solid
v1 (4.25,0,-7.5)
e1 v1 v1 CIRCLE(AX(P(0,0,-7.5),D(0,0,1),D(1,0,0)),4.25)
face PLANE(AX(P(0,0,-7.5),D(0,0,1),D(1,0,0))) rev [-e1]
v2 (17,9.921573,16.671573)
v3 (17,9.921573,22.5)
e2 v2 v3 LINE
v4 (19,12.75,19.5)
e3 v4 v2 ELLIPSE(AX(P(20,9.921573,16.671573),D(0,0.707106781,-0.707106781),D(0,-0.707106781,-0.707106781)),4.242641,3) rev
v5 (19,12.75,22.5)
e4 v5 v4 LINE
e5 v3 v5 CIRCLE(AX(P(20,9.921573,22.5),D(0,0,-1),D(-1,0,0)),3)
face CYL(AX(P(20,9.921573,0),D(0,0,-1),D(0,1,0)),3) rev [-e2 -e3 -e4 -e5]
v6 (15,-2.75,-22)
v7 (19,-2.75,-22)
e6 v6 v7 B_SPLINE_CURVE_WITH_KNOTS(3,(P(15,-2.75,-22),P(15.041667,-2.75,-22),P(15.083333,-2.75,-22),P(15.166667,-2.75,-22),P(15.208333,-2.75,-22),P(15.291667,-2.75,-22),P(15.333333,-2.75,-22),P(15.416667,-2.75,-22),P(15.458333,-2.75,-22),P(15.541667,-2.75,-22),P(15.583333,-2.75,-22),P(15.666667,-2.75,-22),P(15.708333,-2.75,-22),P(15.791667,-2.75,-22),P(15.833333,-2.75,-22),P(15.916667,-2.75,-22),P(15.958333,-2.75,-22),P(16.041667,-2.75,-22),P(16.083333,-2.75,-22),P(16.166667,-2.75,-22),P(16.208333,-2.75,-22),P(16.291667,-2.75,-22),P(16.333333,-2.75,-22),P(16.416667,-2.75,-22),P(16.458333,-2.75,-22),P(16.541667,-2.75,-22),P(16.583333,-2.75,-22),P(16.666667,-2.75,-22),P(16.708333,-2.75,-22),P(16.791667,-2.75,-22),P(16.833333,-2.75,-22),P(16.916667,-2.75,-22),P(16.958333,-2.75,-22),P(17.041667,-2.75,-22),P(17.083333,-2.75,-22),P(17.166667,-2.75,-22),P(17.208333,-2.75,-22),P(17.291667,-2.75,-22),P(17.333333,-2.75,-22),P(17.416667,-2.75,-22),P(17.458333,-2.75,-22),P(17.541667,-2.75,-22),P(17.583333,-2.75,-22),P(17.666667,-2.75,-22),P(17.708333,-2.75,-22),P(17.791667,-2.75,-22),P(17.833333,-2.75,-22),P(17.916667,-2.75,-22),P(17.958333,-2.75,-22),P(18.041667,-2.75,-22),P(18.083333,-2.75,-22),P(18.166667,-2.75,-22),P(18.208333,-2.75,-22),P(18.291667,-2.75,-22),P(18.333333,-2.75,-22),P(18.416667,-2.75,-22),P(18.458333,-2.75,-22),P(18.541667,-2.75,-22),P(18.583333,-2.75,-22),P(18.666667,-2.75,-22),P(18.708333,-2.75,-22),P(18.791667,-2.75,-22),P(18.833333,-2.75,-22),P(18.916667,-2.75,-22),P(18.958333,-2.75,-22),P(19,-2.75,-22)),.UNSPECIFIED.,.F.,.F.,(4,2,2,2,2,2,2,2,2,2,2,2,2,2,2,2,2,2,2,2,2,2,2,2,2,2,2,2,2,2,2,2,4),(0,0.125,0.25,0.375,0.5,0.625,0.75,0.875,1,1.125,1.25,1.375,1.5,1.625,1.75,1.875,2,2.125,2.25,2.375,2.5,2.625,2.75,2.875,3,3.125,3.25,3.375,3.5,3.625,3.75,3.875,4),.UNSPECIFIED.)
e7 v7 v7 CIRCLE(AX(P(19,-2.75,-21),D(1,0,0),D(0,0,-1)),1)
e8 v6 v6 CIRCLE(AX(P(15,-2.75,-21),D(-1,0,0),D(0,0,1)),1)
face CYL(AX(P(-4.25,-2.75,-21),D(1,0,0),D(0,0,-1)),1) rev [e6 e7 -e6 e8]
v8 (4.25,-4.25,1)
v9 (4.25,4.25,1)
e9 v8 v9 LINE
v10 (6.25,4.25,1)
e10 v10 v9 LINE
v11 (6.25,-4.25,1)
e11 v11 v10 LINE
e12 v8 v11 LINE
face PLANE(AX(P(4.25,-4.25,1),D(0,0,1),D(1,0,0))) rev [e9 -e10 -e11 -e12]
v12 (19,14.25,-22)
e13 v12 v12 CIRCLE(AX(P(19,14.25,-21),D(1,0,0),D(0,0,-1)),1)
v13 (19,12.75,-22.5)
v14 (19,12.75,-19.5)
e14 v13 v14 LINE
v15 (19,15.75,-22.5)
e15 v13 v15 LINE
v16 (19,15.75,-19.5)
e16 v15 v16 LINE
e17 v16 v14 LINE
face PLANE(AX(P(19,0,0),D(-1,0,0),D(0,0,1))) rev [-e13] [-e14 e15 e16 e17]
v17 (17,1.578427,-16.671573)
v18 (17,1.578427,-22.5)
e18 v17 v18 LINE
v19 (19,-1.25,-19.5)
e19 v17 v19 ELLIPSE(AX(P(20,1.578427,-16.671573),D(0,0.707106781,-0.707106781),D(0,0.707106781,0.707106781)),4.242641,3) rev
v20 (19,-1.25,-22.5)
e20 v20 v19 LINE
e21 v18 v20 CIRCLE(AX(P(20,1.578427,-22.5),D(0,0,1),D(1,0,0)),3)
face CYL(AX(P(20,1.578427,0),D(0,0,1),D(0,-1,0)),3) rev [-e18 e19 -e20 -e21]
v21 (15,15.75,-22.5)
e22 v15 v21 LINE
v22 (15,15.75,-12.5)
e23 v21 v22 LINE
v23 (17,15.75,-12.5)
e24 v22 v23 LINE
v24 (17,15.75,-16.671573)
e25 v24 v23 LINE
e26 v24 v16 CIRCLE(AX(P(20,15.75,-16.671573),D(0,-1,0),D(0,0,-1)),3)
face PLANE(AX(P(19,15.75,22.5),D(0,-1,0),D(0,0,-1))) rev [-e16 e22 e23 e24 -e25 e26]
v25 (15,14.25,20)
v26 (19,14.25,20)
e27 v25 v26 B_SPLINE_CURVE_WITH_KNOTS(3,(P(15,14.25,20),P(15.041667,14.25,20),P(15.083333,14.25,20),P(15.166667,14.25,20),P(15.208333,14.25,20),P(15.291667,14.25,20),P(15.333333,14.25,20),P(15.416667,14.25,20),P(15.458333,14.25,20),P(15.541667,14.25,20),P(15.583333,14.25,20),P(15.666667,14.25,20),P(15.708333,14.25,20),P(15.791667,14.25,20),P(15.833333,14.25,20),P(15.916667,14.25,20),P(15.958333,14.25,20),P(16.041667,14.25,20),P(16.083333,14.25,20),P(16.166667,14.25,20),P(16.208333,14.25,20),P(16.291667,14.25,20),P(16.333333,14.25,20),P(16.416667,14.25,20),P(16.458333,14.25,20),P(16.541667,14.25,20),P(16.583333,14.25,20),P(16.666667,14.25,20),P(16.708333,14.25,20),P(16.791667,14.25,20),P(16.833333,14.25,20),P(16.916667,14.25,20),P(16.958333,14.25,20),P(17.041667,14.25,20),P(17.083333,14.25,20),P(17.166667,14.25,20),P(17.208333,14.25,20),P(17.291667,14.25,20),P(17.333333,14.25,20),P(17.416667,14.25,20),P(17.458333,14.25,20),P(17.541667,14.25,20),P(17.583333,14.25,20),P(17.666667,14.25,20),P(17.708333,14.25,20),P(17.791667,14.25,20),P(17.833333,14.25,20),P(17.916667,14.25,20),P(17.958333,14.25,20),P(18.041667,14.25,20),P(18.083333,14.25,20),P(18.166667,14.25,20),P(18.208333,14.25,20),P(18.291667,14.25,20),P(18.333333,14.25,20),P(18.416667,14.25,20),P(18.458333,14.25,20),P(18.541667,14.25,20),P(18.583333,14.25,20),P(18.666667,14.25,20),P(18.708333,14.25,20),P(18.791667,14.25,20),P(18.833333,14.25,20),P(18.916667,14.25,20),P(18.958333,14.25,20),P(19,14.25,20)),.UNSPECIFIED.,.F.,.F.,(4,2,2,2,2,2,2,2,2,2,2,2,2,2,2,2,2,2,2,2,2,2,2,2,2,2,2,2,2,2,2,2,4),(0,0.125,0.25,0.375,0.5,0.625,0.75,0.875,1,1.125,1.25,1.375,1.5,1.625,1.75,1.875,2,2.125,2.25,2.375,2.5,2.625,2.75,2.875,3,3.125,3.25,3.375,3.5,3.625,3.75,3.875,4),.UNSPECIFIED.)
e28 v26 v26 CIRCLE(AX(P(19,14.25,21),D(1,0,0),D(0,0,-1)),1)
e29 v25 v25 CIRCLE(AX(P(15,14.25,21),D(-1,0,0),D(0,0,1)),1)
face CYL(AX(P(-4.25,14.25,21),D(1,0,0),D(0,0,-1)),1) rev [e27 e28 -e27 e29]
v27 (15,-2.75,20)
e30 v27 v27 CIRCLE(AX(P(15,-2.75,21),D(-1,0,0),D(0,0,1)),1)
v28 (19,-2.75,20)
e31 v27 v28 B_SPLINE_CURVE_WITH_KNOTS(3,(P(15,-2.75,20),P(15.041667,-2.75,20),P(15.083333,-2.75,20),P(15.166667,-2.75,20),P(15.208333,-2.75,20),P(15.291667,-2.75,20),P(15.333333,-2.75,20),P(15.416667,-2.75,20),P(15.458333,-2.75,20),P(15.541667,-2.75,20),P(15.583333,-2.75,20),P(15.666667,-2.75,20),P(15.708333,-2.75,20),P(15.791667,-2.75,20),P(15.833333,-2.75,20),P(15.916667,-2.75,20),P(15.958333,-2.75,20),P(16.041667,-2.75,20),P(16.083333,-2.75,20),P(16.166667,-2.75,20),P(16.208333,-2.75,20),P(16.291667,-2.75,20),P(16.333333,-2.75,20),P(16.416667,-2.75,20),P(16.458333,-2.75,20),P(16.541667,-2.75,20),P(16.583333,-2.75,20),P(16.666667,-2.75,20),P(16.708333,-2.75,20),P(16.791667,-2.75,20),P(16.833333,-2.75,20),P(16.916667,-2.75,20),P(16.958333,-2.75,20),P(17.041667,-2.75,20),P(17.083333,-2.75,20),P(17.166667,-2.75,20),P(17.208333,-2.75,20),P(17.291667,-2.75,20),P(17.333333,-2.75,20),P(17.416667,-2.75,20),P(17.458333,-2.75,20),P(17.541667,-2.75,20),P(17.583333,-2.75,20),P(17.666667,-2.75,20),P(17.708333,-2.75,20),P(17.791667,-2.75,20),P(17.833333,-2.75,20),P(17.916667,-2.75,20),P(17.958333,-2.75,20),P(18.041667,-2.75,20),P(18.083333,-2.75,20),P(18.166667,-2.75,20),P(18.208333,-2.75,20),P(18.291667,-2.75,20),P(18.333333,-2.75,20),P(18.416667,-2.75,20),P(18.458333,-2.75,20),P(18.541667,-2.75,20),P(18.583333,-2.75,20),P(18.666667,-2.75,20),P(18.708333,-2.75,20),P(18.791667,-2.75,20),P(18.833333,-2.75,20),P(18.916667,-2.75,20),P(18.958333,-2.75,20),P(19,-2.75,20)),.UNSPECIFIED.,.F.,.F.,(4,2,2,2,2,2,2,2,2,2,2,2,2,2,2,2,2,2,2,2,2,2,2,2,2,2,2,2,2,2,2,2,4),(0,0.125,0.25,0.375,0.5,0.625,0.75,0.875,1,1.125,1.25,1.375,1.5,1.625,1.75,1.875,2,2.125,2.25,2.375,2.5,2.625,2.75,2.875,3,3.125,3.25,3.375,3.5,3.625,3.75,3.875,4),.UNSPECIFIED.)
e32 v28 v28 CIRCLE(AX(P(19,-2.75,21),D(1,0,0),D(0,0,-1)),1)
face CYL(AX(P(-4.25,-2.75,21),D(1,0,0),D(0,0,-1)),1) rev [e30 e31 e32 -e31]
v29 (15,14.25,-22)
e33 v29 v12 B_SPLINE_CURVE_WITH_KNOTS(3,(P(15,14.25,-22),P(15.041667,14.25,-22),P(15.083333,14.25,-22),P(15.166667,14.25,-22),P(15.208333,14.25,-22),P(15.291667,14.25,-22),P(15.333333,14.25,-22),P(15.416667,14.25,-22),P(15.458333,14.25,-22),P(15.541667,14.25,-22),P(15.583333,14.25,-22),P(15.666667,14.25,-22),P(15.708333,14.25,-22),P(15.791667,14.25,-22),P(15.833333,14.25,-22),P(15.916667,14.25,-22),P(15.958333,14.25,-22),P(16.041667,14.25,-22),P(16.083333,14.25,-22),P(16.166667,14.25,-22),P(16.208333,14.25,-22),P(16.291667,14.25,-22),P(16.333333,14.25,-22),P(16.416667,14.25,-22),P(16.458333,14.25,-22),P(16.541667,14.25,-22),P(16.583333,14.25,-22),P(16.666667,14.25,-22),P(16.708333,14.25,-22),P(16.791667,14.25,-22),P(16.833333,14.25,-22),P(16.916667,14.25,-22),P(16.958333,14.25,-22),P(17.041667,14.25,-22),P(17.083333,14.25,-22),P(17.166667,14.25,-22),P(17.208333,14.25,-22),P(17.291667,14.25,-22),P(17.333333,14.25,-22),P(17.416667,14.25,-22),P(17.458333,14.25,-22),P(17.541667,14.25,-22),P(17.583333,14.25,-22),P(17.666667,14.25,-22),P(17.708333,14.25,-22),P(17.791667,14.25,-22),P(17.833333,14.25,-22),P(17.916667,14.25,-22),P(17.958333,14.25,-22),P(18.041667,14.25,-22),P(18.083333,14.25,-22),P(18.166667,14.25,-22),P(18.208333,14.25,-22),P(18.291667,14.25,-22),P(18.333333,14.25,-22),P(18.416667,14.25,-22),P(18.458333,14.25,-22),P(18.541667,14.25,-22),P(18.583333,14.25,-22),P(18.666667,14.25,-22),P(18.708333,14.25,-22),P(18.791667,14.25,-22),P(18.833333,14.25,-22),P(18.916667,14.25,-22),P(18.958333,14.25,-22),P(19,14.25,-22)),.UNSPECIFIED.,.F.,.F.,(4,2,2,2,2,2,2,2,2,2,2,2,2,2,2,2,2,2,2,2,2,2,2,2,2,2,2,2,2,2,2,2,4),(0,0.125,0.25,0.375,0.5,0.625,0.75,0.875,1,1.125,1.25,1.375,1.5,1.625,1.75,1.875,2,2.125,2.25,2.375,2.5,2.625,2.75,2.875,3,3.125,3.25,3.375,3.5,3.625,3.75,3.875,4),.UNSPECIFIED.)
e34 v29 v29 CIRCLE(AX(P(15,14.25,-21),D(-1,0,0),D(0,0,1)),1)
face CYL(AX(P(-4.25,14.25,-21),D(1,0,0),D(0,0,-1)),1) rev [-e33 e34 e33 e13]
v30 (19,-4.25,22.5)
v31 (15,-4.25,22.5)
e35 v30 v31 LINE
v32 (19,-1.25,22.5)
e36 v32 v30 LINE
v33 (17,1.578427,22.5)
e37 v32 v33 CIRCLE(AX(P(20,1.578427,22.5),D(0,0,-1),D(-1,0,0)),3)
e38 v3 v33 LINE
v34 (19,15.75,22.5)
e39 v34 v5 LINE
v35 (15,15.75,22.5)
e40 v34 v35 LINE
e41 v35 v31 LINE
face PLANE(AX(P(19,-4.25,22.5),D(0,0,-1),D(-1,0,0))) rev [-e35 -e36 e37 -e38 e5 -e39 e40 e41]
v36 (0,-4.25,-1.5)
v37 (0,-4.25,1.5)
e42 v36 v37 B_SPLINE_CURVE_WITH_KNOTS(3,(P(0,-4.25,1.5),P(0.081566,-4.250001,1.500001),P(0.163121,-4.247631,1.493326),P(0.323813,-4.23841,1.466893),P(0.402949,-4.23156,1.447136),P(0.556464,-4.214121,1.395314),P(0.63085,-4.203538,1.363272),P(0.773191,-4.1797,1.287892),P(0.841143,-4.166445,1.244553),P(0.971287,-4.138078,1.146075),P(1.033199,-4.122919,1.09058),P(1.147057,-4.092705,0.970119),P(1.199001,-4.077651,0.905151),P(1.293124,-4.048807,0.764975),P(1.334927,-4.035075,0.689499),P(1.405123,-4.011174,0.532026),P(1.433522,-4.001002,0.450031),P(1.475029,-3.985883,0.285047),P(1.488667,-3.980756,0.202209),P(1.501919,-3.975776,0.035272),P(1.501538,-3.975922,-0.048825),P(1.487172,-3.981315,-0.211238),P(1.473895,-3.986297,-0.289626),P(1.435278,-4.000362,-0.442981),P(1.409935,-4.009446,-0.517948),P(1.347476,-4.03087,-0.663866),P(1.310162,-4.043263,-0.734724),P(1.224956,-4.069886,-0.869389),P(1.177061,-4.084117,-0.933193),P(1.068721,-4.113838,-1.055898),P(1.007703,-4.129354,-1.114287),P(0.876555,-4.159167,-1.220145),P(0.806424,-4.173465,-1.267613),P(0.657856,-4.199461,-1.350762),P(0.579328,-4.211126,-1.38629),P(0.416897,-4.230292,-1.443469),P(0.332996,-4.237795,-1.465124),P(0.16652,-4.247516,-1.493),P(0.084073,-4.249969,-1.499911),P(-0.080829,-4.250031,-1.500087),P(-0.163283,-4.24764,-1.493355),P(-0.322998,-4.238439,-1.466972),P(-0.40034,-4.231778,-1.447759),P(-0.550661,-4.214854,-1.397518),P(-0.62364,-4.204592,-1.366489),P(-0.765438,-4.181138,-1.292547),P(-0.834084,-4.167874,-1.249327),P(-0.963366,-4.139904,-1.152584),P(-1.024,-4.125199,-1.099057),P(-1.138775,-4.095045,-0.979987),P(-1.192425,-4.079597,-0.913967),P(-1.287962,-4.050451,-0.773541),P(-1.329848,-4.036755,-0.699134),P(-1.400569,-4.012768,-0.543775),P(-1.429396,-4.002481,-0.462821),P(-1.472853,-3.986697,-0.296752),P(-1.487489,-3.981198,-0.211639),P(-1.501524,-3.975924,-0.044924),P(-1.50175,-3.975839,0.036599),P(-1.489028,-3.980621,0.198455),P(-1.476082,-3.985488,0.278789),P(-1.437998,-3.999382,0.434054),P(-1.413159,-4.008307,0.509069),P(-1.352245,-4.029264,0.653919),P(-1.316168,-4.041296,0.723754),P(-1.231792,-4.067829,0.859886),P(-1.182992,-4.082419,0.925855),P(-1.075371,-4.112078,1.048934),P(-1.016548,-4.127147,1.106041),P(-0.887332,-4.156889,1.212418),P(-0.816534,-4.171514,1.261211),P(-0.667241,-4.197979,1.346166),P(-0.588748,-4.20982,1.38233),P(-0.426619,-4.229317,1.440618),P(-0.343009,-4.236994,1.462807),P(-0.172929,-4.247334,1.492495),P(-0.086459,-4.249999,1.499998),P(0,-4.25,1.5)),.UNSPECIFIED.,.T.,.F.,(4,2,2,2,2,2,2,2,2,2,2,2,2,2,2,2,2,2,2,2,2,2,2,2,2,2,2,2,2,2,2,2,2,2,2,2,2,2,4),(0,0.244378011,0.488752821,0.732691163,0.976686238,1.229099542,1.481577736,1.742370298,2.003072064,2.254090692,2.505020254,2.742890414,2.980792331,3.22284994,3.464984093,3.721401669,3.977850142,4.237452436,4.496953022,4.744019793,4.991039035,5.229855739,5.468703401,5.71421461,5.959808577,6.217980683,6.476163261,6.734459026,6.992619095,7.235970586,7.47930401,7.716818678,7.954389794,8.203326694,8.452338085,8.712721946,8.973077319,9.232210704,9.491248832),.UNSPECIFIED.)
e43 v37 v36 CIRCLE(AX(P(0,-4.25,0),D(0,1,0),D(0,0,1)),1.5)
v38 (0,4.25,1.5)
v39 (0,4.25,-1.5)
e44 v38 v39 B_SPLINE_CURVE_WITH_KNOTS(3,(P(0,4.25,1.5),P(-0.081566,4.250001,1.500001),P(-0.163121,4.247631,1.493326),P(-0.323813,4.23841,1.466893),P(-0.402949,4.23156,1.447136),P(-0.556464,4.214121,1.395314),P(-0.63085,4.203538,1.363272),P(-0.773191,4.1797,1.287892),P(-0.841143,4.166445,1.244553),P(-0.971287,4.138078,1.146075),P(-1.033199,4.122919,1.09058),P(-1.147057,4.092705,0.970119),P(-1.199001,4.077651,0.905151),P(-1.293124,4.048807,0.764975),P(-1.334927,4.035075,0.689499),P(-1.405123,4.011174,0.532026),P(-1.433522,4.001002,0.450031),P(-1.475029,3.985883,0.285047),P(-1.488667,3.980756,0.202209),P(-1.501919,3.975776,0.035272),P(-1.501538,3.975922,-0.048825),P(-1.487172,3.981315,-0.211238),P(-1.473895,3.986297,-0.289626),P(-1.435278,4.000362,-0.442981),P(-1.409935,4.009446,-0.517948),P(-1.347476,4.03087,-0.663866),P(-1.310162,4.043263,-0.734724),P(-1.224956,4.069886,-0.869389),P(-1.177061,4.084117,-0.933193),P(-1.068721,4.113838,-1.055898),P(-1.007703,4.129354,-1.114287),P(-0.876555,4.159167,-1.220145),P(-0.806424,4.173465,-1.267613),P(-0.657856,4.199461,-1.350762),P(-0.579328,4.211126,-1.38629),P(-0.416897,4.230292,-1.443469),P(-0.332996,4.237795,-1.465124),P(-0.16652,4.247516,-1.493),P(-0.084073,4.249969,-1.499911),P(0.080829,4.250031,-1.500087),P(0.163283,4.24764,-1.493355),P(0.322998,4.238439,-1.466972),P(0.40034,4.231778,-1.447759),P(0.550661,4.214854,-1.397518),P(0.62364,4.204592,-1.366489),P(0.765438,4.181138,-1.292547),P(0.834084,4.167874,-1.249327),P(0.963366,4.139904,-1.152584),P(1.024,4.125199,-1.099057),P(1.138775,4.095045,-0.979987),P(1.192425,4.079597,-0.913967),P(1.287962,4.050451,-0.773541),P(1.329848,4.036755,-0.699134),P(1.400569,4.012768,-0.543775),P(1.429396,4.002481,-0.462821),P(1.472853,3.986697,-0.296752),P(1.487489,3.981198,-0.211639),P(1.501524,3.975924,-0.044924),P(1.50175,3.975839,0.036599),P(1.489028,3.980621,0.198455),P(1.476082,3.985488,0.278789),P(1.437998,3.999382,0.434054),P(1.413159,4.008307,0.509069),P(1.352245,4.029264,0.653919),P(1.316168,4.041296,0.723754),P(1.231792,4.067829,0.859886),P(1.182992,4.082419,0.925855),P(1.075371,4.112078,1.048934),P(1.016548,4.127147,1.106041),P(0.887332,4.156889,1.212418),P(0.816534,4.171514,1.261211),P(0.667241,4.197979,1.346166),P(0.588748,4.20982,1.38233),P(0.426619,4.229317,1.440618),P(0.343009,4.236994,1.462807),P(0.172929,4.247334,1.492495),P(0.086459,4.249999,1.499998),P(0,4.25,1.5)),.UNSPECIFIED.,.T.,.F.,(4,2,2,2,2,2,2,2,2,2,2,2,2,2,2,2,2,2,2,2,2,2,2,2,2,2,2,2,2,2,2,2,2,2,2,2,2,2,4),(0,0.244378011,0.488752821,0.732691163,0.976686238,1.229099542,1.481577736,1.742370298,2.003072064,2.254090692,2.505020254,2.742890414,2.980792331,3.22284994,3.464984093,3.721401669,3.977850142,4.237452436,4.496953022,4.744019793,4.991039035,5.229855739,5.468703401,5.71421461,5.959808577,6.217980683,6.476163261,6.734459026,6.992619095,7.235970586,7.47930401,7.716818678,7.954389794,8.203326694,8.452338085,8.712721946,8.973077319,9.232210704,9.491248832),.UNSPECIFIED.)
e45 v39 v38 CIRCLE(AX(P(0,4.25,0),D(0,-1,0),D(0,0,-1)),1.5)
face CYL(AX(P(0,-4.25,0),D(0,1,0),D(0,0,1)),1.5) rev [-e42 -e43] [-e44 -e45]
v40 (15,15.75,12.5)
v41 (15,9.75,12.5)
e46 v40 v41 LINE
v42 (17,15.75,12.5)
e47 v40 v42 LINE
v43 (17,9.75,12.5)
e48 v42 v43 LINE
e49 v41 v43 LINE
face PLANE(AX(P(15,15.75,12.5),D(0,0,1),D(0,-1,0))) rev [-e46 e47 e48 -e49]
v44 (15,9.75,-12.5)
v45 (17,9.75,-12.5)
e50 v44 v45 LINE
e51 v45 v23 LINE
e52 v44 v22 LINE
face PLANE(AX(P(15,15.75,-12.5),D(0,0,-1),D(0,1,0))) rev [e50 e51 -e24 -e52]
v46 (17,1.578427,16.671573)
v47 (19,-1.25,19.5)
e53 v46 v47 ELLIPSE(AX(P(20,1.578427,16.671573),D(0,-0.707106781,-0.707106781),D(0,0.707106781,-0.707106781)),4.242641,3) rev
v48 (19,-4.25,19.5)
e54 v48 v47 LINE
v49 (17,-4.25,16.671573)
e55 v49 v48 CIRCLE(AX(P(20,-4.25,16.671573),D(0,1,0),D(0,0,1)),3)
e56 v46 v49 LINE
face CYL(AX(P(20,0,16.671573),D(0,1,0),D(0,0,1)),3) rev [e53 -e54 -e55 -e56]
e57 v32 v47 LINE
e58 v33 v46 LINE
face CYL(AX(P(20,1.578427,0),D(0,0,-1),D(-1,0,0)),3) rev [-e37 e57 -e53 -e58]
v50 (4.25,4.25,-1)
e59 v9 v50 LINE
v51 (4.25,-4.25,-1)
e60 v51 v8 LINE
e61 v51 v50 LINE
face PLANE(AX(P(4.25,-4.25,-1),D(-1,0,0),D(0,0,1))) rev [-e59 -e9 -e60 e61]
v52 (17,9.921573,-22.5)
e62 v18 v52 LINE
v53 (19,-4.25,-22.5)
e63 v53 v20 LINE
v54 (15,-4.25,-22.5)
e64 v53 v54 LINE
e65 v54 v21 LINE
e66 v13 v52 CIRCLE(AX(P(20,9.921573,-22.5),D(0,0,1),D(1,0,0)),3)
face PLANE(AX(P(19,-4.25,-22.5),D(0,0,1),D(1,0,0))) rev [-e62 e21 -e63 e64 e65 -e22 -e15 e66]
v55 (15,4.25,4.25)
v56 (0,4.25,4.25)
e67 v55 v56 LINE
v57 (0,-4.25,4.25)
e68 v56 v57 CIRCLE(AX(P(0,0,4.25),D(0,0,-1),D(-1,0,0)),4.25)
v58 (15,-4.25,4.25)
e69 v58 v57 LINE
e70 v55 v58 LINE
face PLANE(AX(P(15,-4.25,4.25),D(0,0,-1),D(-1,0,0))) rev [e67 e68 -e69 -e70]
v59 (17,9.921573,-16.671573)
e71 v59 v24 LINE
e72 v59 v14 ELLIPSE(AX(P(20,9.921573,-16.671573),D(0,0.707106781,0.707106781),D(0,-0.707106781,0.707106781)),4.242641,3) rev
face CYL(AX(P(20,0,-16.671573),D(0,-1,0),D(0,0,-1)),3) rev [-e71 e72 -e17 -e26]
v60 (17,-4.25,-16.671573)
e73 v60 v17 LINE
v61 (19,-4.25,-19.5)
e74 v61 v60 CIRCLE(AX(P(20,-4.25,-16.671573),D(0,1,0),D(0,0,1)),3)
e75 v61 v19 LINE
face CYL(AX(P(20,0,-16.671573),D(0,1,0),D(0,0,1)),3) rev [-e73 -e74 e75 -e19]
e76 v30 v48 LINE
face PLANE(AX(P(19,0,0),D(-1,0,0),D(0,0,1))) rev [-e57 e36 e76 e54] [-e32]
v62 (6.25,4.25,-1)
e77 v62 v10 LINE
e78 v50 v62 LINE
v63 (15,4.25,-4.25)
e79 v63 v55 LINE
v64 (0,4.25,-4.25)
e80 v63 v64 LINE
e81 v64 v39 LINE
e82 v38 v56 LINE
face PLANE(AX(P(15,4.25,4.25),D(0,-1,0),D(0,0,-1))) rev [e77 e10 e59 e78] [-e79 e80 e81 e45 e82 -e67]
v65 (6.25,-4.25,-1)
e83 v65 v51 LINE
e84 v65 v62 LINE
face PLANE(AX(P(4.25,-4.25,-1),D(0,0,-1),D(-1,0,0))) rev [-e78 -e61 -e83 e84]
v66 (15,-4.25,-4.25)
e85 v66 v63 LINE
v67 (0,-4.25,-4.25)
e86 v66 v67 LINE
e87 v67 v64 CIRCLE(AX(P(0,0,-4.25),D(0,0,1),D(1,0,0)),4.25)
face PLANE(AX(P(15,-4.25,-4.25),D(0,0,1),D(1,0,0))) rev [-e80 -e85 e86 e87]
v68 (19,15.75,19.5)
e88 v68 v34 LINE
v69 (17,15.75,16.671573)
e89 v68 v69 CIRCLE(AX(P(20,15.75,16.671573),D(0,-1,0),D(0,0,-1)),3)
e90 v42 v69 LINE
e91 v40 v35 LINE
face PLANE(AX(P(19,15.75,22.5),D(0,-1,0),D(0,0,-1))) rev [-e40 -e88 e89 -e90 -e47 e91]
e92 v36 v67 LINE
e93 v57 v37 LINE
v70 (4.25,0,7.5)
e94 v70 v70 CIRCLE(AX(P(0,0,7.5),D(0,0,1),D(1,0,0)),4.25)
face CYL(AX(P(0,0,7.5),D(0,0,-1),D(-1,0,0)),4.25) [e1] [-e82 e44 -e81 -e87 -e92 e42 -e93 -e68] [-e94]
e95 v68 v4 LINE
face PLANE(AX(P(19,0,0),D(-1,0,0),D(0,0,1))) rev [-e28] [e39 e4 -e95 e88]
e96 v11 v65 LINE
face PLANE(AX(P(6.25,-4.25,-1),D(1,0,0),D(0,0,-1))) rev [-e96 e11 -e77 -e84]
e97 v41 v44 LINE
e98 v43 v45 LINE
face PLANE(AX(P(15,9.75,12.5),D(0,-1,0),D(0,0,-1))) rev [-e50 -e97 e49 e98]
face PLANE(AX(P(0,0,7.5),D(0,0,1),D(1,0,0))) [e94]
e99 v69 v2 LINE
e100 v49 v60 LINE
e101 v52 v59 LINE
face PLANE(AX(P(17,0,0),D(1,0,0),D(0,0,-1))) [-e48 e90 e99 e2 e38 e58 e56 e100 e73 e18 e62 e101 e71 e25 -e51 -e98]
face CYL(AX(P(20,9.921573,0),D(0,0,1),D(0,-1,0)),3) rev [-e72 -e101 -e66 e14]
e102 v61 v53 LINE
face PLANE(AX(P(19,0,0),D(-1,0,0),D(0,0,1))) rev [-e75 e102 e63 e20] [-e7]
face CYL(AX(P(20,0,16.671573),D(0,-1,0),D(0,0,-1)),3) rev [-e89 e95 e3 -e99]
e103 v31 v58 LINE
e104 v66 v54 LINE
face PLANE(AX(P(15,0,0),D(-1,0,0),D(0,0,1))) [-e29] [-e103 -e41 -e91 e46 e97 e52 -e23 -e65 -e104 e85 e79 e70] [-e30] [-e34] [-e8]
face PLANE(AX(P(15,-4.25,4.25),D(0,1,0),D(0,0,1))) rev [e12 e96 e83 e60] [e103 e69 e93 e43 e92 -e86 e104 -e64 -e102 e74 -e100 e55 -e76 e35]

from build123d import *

# Parameters (mm, degrees)
SKETCH1_R               = 4.25
BOSS_EXTRUDE1_DEPTH     = 7.5
SKETCH2_W               = 8.5
SKETCH2_H               = 8.5
BOSS_EXTRUDE2_DEPTH     = 15
SKETCH3_W               = 45
SKETCH3_H               = 20
BOSS_EXTRUDE3_DEPTH     = 4
SKETCH4_R               = 1
CUT_EXTRUDE1_DEPTH      = 36.984371608
CUT_EXTRUDE2_DEPTH      = 2
SKETCH6_W               = 25
SKETCH6_H               = 6
CUT_EXTRUDE3_DEPTH      = 2
CUT_EXTRUDE4_DEPTH      = 32.614869919
CUT_EXTRUDE4_DEPTH_BACK = 32.614869919
SKETCH7_R               = 1.5
CUT_EXTRUDE5_DEPTH      = 34.396294705
CUT_EXTRUDE5_DEPTH_BACK = 34.396294705
SKETCH8_W               = 2
SKETCH8_H               = 2
FILLET1_R               = 3


with BuildPart() as part:
    # Sketch1 → Boss-Extrude1 (new, symmetric)
    with BuildSketch(Plane.XY):
        Circle(SKETCH1_R)
    extrude(amount=BOSS_EXTRUDE1_DEPTH, both=True)

    # Sketch2 → Boss-Extrude2 (add)
    with BuildSketch(Plane(origin=(0, 0, 0), x_dir=(0, 0, -1), z_dir=(1, 0, 0))):
        Rectangle(SKETCH2_W, SKETCH2_H)
    extrude(amount=BOSS_EXTRUDE2_DEPTH)

    # Sketch3 → Boss-Extrude3 (add)
    with BuildSketch(Plane(origin=(15, 0, 0), x_dir=(0, 0, -1), z_dir=(1, 0, 0))):
        with Locations((0, 5.75)):
            Rectangle(SKETCH3_W, SKETCH3_H)
    extrude(amount=BOSS_EXTRUDE3_DEPTH)

    # Sketch4 → Cut-Extrude1 (cut, through all)
    with BuildSketch(Plane(origin=(19, 0, 0), x_dir=(0, 0, -1), z_dir=(1, 0, 0))):
        with Locations((-21, 14.25)):
            Circle(SKETCH4_R)
        with Locations((-21, -2.75)):
            Circle(SKETCH4_R)
        with Locations((21, -2.75)):
            Circle(SKETCH4_R)
        with Locations((21, 14.25)):
            Circle(SKETCH4_R)
    extrude(amount=-CUT_EXTRUDE1_DEPTH, mode=Mode.SUBTRACT)

    # Sketch5 → Cut-Extrude2 (cut)
    with BuildSketch(Plane(origin=(19, 0, 0), x_dir=(0, 0, -1), z_dir=(1, 0, 0))):
        Polygon((19.5, 15.75), (-19.5, 15.75), (-19.5, 12.75), (-22.5, 12.75), (-22.5, -1.25), (-19.5, -1.25), (-19.5, -4.25), (19.5, -4.25), (19.5, -1.25), (22.5, -1.25), (22.5, 12.75), (19.5, 12.75), align=None)
    extrude(amount=-CUT_EXTRUDE2_DEPTH, mode=Mode.SUBTRACT)

    # Sketch6 → Cut-Extrude3 (cut)
    with BuildSketch(Plane(origin=(17, 0, 0), x_dir=(0, 0, -1), z_dir=(1, 0, 0))):
        with Locations((0, 12.75)):
            Rectangle(SKETCH6_W, SKETCH6_H)
    extrude(amount=-CUT_EXTRUDE3_DEPTH, mode=Mode.SUBTRACT)

    # Sketch7 → Cut-Extrude4 (cut, two sides: drawn at the far end of the back side and taken through both)
    with BuildSketch(Plane(origin=(0, 4.25, 0), x_dir=(1, 0, 0), z_dir=(0, 1, 0)).offset(-CUT_EXTRUDE4_DEPTH_BACK)):
        with Locations(Location((0, 0, 0), (0, 0, 270))):
            Circle(SKETCH7_R)
    extrude(amount=CUT_EXTRUDE4_DEPTH + CUT_EXTRUDE4_DEPTH_BACK, mode=Mode.SUBTRACT)

    # Sketch8 → Cut-Extrude5 (cut, two sides: drawn at the far end of the back side and taken through both)
    with BuildSketch(Plane(origin=(0, 0, 0), x_dir=(1, 0, 0), z_dir=(0, 1, 0)).offset(-CUT_EXTRUDE5_DEPTH_BACK)):
        with Locations((5.25, 0)):
            Rectangle(SKETCH8_W, SKETCH8_H)
    extrude(amount=CUT_EXTRUDE5_DEPTH + CUT_EXTRUDE5_DEPTH_BACK, mode=Mode.SUBTRACT)

    # Fillet1
    # the kernel refuses this fillet: 3 mm, written as the material it adds along each edge
    with BuildSketch(Plane(origin=(17, -1.25, -19.5), x_dir=(0, 1, 0), z_dir=(0, 0, -1)), Plane(origin=(17, -4.25, -19.5), x_dir=(0, 0, 1), z_dir=(0, 1, 0)), Plane(origin=(17, 12.75, -19.5), x_dir=(0, 0, 1), z_dir=(0, 1, 0)), Plane(origin=(17, 12.75, -22.5), x_dir=(0, -1, 0), z_dir=(0, 0, 1)), Plane(origin=(17, -1.25, 22.5), x_dir=(0, 1, 0), z_dir=(0, 0, -1)), Plane(origin=(17, 15.75, 19.5), x_dir=(0, 0, -1), z_dir=(0, -1, 0)), Plane(origin=(17, 12.75, 19.5), x_dir=(0, -1, 0), z_dir=(0, 0, 1))) as fillet1_piece_1:
        with BuildLine():
            CenterArc((2.828427125, 3), FILLET1_R, 199.471220634, 70.528779366)
            Line((0, 2), (-0.056568542, 1.98))
            ThreePointArc((-0.056568542, 1.98), (-0.06, 1), (-0.06, 0))
            Line((-0.06, 0), (0, -0.06))
            Line((0, -0.06), (2.828427125, -0.06))
            Line((2.828427125, -0.06), (2.828427125, 0))
        make_face()
    extrude(amount=3)
    with BuildSketch(Plane(origin=(17, -1.25, 19.5), x_dir=(1, 0, 0), z_dir=(0, -1, 0))) as fillet1_piece_2:
        with BuildLine():
            CenterArc((3, -2.828427125), FILLET1_R, 109.471220634, 70.528779366)
            Line((0, -2.828427125), (-0.06, -2.828427125))
            Line((-0.06, -2.828427125), (-0.06, 0))
            Line((-0.06, 0), (0, 0.06))
            ThreePointArc((0, 0.06), (1, 0.06), (1.98, 0.056568542))
            Line((1.98, 0.056568542), (2, 0))
        make_face()
    extrude(amount=3)
    with BuildSketch(Plane(origin=(17, -1.25, -12.428932188), x_dir=(0, 1, 0), z_dir=(0, 0, -1))) as fillet1_piece_3a_section:
        with BuildLine():
            CenterArc((2.828427125, 3), FILLET1_R, 199.471220634, 70.528779366)
            Line((0, 2), (-0.056568542, 1.98))
            ThreePointArc((-0.056568542, 1.98), (-0.06, 1), (-0.06, 0))
            Line((-0.06, 0), (0, -0.06))
            Line((0, -0.06), (2.828427125, -0.06))
            Line((2.828427125, -0.06), (2.828427125, 0))
        make_face()
    fillet1_piece_3a = extrude(amount=10.071067812, mode=Mode.PRIVATE)
    fillet1_piece_3a = split(fillet1_piece_3a, bisect_by=Plane(origin=(17.51353179, -0.571681569, -19.5), z_dir=(0, 0, 1)), keep=Keep.TOP, mode=Mode.PRIVATE)
    with BuildSketch(Plane(origin=(17, -4.25, -19.5), x_dir=(0, 0, 1), z_dir=(0, 1, 0))) as fillet1_piece_3b_section:
        with BuildLine():
            CenterArc((2.828427125, 3), FILLET1_R, 199.471220634, 70.528779366)
            Line((0, 2), (-0.056568542, 1.98))
            ThreePointArc((-0.056568542, 1.98), (-0.06, 1), (-0.06, 0))
            Line((-0.06, 0), (0, -0.06))
            Line((0, -0.06), (2.828427125, -0.06))
            Line((2.828427125, -0.06), (2.828427125, 0))
        make_face()
    fillet1_piece_3b = extrude(amount=10.071067812, mode=Mode.PRIVATE)
    fillet1_piece_3b = split(fillet1_piece_3b, bisect_by=Plane(origin=(17.51353179, -1.25, -18.821681569), z_dir=(0, 1, 0)), keep=Keep.TOP, mode=Mode.PRIVATE)
    fillet1_piece_3 = fillet1_piece_3a & fillet1_piece_3b
    add(fillet1_piece_3)
    with BuildSketch(Plane(origin=(17, 5.678932188, -19.5), x_dir=(0, 0, 1), z_dir=(0, 1, 0))) as fillet1_piece_4a_section:
        with BuildLine():
            CenterArc((2.828427125, 3), FILLET1_R, 199.471220634, 70.528779366)
            Line((0, 2), (-0.056568542, 1.98))
            ThreePointArc((-0.056568542, 1.98), (-0.06, 1), (-0.06, 0))
            Line((-0.06, 0), (0, -0.06))
            Line((0, -0.06), (2.828427125, -0.06))
            Line((2.828427125, -0.06), (2.828427125, 0))
        make_face()
    fillet1_piece_4a = extrude(amount=10.071067812, mode=Mode.PRIVATE)
    fillet1_piece_4a = split(fillet1_piece_4a, bisect_by=Plane(origin=(17.51353179, 12.75, -18.821681569), z_dir=(0, -1, 0)), keep=Keep.TOP, mode=Mode.PRIVATE)
    with BuildSketch(Plane(origin=(17, 12.75, -22.5), x_dir=(0, -1, 0), z_dir=(0, 0, 1))) as fillet1_piece_4b_section:
        with BuildLine():
            CenterArc((2.828427125, 3), FILLET1_R, 199.471220634, 70.528779366)
            Line((0, 2), (-0.056568542, 1.98))
            ThreePointArc((-0.056568542, 1.98), (-0.06, 1), (-0.06, 0))
            Line((-0.06, 0), (0, -0.06))
            Line((0, -0.06), (2.828427125, -0.06))
            Line((2.828427125, -0.06), (2.828427125, 0))
        make_face()
    fillet1_piece_4b = extrude(amount=10.071067812, mode=Mode.PRIVATE)
    fillet1_piece_4b = split(fillet1_piece_4b, bisect_by=Plane(origin=(17.51353179, 12.071681569, -12.5), z_dir=(0, 0, -1)), keep=Keep.TOP, mode=Mode.PRIVATE)
    fillet1_piece_4b = split(fillet1_piece_4b, bisect_by=Plane(origin=(17.51353179, 12.071681569, -19.5), z_dir=(0, 0, 1)), keep=Keep.TOP, mode=Mode.PRIVATE)
    fillet1_piece_4 = fillet1_piece_4a & fillet1_piece_4b
    add(fillet1_piece_4)
    with BuildSketch(Plane(origin=(17, 5.821067812, 19.5), x_dir=(1, 0, 0), z_dir=(0, -1, 0))) as fillet1_piece_5a_section:
        with BuildLine():
            CenterArc((3, -2.828427125), FILLET1_R, 109.471220634, 70.528779366)
            Line((0, -2.828427125), (-0.06, -2.828427125))
            Line((-0.06, -2.828427125), (-0.06, 0))
            Line((-0.06, 0), (0, 0.06))
            ThreePointArc((0, 0.06), (1, 0.06), (1.98, 0.056568542))
            Line((1.98, 0.056568542), (2, 0))
        make_face()
    fillet1_piece_5a = extrude(amount=10.071067812, mode=Mode.PRIVATE)
    fillet1_piece_5a = split(fillet1_piece_5a, bisect_by=Plane(origin=(17.51353179, -1.25, 18.821681569), z_dir=(0, 1, 0)), keep=Keep.TOP, mode=Mode.PRIVATE)
    with BuildSketch(Plane(origin=(17, -1.25, 22.5), x_dir=(0, 1, 0), z_dir=(0, 0, -1))) as fillet1_piece_5b_section:
        with BuildLine():
            CenterArc((2.828427125, 3), FILLET1_R, 199.471220634, 70.528779366)
            Line((0, 2), (-0.056568542, 1.98))
            ThreePointArc((-0.056568542, 1.98), (-0.06, 1), (-0.06, 0))
            Line((-0.06, 0), (0, -0.06))
            Line((0, -0.06), (2.828427125, -0.06))
            Line((2.828427125, -0.06), (2.828427125, 0))
        make_face()
    fillet1_piece_5b = extrude(amount=10.071067812, mode=Mode.PRIVATE)
    fillet1_piece_5b = split(fillet1_piece_5b, bisect_by=Plane(origin=(17.51353179, -0.571681569, 19.5), z_dir=(0, 0, -1)), keep=Keep.TOP, mode=Mode.PRIVATE)
    fillet1_piece_5 = fillet1_piece_5a & fillet1_piece_5b
    add(fillet1_piece_5)
    with BuildSketch(Plane(origin=(17, 12.75, 12.428932188), x_dir=(0, -1, 0), z_dir=(0, 0, 1))) as fillet1_piece_6a_section:
        with BuildLine():
            CenterArc((2.828427125, 3), FILLET1_R, 199.471220634, 70.528779366)
            Line((0, 2), (-0.056568542, 1.98))
            ThreePointArc((-0.056568542, 1.98), (-0.06, 1), (-0.06, 0))
            Line((-0.06, 0), (0, -0.06))
            Line((0, -0.06), (2.828427125, -0.06))
            Line((2.828427125, -0.06), (2.828427125, 0))
        make_face()
    fillet1_piece_6a = extrude(amount=10.071067812, mode=Mode.PRIVATE)
    fillet1_piece_6a = split(fillet1_piece_6a, bisect_by=Plane(origin=(17.51353179, 12.071681569, 12.5), z_dir=(0, 0, 1)), keep=Keep.TOP, mode=Mode.PRIVATE)
    fillet1_piece_6a = split(fillet1_piece_6a, bisect_by=Plane(origin=(17.51353179, 12.071681569, 19.5), z_dir=(0, 0, -1)), keep=Keep.TOP, mode=Mode.PRIVATE)
    with BuildSketch(Plane(origin=(17, 15.75, 19.5), x_dir=(0, 0, -1), z_dir=(0, -1, 0))) as fillet1_piece_6b_section:
        with BuildLine():
            CenterArc((2.828427125, 3), FILLET1_R, 199.471220634, 70.528779366)
            Line((0, 2), (-0.056568542, 1.98))
            ThreePointArc((-0.056568542, 1.98), (-0.06, 1), (-0.06, 0))
            Line((-0.06, 0), (0, -0.06))
            Line((0, -0.06), (2.828427125, -0.06))
            Line((2.828427125, -0.06), (2.828427125, 0))
        make_face()
    fillet1_piece_6b = extrude(amount=10.071067812, mode=Mode.PRIVATE)
    fillet1_piece_6b = split(fillet1_piece_6b, bisect_by=Plane(origin=(17.51353179, 12.75, 18.821681569), z_dir=(0, -1, 0)), keep=Keep.TOP, mode=Mode.PRIVATE)
    fillet1_piece_6 = fillet1_piece_6a & fillet1_piece_6b
    add(fillet1_piece_6)


solid = part.part
